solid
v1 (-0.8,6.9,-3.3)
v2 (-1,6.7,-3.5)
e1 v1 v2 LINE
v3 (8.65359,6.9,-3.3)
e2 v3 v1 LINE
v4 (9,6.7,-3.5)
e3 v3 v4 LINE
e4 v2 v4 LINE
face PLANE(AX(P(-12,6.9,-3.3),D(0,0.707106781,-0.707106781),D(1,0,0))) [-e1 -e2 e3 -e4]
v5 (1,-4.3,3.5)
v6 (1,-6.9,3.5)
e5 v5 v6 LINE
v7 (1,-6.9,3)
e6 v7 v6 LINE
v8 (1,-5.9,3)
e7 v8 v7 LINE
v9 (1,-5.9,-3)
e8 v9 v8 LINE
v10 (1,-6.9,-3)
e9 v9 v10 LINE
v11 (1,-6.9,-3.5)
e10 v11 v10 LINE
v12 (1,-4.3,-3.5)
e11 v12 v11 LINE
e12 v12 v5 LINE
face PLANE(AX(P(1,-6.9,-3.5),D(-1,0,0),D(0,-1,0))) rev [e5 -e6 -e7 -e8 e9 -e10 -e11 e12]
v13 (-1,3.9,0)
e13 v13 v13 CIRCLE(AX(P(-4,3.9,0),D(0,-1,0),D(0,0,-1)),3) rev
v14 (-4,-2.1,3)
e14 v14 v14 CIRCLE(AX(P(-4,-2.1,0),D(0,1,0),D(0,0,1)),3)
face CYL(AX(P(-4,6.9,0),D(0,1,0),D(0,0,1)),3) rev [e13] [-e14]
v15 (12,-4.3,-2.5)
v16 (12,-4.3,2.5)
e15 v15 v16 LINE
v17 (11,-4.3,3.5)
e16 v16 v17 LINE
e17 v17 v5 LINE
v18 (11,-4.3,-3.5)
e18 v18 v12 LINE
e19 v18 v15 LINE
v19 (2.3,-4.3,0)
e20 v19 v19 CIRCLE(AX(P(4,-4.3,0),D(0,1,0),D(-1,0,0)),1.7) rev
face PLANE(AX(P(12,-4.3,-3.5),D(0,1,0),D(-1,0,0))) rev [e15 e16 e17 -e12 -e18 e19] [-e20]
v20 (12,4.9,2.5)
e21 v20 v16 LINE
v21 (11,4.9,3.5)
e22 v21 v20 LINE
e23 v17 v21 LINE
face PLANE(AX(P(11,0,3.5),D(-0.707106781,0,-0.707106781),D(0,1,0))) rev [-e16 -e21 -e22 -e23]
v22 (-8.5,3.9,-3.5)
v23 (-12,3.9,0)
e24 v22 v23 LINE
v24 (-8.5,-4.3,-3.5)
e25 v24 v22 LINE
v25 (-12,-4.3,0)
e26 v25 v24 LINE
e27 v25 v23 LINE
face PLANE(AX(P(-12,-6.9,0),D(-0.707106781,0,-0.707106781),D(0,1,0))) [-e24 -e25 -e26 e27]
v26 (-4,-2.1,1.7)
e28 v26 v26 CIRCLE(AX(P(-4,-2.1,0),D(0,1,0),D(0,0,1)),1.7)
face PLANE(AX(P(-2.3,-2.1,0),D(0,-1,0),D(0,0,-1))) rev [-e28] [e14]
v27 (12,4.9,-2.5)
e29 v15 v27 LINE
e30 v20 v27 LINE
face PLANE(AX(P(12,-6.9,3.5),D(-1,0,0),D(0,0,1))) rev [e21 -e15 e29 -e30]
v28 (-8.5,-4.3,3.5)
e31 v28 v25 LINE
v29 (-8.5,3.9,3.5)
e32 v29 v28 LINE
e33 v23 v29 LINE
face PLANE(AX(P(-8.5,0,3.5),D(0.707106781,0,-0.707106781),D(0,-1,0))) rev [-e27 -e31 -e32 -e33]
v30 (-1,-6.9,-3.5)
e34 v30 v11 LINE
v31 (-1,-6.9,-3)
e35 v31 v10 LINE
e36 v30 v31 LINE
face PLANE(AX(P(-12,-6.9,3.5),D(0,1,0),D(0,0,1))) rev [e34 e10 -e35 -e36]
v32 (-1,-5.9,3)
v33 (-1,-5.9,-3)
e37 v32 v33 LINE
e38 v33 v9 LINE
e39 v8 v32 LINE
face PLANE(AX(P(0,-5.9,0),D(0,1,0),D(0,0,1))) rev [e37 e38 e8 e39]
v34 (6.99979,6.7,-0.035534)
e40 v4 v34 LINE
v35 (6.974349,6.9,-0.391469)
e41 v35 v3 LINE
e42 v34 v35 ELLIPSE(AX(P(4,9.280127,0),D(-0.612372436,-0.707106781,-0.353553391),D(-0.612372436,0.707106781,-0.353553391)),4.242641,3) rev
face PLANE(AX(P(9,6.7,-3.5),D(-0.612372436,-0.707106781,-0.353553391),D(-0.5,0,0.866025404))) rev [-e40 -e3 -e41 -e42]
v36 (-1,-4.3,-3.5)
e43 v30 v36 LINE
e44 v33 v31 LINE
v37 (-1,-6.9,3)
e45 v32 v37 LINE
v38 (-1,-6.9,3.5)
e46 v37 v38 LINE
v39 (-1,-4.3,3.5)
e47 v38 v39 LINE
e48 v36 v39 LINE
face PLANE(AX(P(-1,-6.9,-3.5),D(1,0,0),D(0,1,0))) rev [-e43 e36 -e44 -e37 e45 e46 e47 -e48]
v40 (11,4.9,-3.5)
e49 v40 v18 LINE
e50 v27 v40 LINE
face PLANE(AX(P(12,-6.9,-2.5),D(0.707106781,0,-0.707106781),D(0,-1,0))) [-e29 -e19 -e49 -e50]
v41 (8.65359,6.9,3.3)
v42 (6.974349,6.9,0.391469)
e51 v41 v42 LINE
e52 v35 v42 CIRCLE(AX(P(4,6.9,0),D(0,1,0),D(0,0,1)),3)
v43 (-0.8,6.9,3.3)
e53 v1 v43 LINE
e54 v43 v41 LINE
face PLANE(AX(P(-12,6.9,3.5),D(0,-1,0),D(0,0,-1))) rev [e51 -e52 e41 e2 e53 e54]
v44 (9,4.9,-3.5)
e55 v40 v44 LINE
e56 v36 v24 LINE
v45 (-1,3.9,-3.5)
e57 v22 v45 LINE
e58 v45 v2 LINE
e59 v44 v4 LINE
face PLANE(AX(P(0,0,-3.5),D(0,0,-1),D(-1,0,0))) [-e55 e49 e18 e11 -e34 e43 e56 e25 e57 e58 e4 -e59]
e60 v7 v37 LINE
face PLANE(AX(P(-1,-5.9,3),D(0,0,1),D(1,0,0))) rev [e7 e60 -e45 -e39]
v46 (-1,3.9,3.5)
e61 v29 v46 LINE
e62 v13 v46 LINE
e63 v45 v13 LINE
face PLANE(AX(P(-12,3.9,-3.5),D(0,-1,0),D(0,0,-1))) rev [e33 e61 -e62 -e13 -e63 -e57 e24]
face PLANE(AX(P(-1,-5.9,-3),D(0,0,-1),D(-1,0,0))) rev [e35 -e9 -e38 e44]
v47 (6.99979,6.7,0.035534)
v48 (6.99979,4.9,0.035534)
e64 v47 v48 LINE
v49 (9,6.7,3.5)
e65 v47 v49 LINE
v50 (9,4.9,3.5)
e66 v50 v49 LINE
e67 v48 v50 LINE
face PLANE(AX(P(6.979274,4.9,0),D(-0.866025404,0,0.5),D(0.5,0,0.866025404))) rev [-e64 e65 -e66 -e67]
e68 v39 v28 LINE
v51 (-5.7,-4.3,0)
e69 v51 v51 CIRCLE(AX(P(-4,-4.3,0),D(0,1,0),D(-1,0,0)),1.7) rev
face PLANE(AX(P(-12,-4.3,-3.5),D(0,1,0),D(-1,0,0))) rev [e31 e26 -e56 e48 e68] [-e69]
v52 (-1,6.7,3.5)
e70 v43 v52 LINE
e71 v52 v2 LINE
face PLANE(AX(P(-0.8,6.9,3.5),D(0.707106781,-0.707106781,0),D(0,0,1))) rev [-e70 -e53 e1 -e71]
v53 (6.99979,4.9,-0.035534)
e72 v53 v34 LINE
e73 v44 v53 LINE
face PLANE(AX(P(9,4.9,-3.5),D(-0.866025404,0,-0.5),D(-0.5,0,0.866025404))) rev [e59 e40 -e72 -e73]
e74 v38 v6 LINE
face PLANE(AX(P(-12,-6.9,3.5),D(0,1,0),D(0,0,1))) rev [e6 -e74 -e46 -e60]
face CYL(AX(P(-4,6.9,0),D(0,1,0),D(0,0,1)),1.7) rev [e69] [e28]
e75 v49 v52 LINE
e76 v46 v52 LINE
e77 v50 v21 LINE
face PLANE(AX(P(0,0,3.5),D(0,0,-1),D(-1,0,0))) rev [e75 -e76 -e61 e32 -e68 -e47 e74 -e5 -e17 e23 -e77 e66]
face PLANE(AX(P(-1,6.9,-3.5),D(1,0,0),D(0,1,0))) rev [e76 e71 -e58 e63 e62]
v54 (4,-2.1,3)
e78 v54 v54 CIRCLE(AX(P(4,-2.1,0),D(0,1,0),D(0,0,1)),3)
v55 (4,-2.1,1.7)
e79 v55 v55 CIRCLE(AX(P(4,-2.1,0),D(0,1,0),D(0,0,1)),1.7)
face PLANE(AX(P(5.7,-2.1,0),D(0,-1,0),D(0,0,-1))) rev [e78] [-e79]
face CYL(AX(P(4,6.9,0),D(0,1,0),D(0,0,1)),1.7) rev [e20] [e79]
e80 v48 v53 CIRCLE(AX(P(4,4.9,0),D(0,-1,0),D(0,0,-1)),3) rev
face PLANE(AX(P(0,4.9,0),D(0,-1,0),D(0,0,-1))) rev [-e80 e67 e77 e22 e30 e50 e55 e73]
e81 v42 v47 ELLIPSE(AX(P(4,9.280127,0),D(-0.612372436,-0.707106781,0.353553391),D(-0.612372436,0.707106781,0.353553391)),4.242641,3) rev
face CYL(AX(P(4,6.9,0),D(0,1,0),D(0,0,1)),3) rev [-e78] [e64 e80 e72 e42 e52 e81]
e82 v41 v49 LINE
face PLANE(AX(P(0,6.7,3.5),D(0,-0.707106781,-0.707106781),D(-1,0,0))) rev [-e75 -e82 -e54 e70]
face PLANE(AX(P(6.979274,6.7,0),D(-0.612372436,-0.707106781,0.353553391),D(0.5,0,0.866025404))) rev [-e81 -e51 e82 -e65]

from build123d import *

# Parameters (mm, degrees)
SKETCH_1_W                = 24
SKETCH_1_H                = 13.8
EXTRUDE_1_DEPTH           = 3.5
HOLE_WIZARD_1_D           = 3.4
HOLE_WIZARD_1_CBORE_D     = 6
HOLE_WIZARD_1_CBORE_DEPTH = 9
CUT_EXTRUDE_1_DEPTH       = 2
SKETCH_5_W                = 11
SKETCH_5_H                = 2.6
SKETCH_5_H_2              = 3
CUT_EXTRUDE_2_DEPTH       = 16.511608556
SKETCH_6_W                = 2
SKETCH_6_H                = 6
CUT_EXTRUDE_3_DEPTH       = 1
CHAMFER_1_SIZE            = 3.5
CHAMFER_2_SIZE            = 0.2
CHAMFER_3_SIZE            = 1


with BuildPart() as part:
    # 草图1 → 凸台-拉伸1 (new, symmetric)
    with BuildSketch(Plane.XY):
        Rectangle(SKETCH_1_W, SKETCH_1_H)
    extrude(amount=EXTRUDE_1_DEPTH, both=True)

    # 打孔尺寸根据内六角圆柱头螺钉的类型1 (through all)
    with Locations(Plane(origin=(0, 6.9, 0), x_dir=(1, 0, 0), z_dir=(0, 1, 0))):
        with Locations((4, 0), (-4, 0)):
            CounterBoreHole(HOLE_WIZARD_1_D / 2, HOLE_WIZARD_1_CBORE_D / 2, HOLE_WIZARD_1_CBORE_DEPTH)

    # 草图4 → 切除-拉伸1 (cut)
    with BuildSketch(Plane(origin=(0, 6.9, 0), x_dir=(1, 0, 0), z_dir=(0, 1, 0))):
        Polygon((9, 3.5), (6.979274058, 0), (9, -3.5), (12, -3.5), (12, 3.5), align=None)
    extrude(amount=-CUT_EXTRUDE_1_DEPTH, mode=Mode.SUBTRACT)

    # 草图5 → 切除-拉伸2 (cut, through all)
    with BuildSketch(Plane.XY.offset(3.5)):
        with Locations((6.5, -5.6)):
            Rectangle(SKETCH_5_W, SKETCH_5_H)
        with Locations((-6.5, -5.6)):
            Rectangle(SKETCH_5_W, SKETCH_5_H)
        with Locations((-6.5, 5.4)):
            Rectangle(SKETCH_5_W, SKETCH_5_H_2)
    extrude(amount=-CUT_EXTRUDE_2_DEPTH, mode=Mode.SUBTRACT)

    # 草图6 → 切除-拉伸3 (cut)
    with BuildSketch(Plane.XZ.offset(6.9)):
        Rectangle(SKETCH_6_W, SKETCH_6_H)
    extrude(amount=-CUT_EXTRUDE_3_DEPTH, mode=Mode.SUBTRACT)

    # 倒角1
    chamfer_1_edges = [part.edges().sort_by_distance(p)[0] for p in [
        (-12, -0.2, -3.5),
        (-12, -0.2, 3.5),
    ]]
    chamfer(chamfer_1_edges, length=CHAMFER_1_SIZE - 0.0001)  # a hair under: the kernel refuses the full size

    # 倒角2
    chamfer_2_edges = [part.edges().sort_by_distance(p)[0] for p in [
        (4, 6.9, -3.5),
        (4, 6.9, 3.5),
        (7.999894775, 6.9, 1.767766937),
        (7.999894775, 6.9, -1.767766937),
        (-1, 6.9, 0),
    ]]
    chamfer(chamfer_2_edges, length=CHAMFER_2_SIZE)

    # 倒角3
    chamfer_3_edges = [part.edges().sort_by_distance(p)[0] for p in [
        (12, 0.3, -3.5),
        (12, 0.3, 3.5),
    ]]
    chamfer(chamfer_3_edges, length=CHAMFER_3_SIZE)


solid = part.part
